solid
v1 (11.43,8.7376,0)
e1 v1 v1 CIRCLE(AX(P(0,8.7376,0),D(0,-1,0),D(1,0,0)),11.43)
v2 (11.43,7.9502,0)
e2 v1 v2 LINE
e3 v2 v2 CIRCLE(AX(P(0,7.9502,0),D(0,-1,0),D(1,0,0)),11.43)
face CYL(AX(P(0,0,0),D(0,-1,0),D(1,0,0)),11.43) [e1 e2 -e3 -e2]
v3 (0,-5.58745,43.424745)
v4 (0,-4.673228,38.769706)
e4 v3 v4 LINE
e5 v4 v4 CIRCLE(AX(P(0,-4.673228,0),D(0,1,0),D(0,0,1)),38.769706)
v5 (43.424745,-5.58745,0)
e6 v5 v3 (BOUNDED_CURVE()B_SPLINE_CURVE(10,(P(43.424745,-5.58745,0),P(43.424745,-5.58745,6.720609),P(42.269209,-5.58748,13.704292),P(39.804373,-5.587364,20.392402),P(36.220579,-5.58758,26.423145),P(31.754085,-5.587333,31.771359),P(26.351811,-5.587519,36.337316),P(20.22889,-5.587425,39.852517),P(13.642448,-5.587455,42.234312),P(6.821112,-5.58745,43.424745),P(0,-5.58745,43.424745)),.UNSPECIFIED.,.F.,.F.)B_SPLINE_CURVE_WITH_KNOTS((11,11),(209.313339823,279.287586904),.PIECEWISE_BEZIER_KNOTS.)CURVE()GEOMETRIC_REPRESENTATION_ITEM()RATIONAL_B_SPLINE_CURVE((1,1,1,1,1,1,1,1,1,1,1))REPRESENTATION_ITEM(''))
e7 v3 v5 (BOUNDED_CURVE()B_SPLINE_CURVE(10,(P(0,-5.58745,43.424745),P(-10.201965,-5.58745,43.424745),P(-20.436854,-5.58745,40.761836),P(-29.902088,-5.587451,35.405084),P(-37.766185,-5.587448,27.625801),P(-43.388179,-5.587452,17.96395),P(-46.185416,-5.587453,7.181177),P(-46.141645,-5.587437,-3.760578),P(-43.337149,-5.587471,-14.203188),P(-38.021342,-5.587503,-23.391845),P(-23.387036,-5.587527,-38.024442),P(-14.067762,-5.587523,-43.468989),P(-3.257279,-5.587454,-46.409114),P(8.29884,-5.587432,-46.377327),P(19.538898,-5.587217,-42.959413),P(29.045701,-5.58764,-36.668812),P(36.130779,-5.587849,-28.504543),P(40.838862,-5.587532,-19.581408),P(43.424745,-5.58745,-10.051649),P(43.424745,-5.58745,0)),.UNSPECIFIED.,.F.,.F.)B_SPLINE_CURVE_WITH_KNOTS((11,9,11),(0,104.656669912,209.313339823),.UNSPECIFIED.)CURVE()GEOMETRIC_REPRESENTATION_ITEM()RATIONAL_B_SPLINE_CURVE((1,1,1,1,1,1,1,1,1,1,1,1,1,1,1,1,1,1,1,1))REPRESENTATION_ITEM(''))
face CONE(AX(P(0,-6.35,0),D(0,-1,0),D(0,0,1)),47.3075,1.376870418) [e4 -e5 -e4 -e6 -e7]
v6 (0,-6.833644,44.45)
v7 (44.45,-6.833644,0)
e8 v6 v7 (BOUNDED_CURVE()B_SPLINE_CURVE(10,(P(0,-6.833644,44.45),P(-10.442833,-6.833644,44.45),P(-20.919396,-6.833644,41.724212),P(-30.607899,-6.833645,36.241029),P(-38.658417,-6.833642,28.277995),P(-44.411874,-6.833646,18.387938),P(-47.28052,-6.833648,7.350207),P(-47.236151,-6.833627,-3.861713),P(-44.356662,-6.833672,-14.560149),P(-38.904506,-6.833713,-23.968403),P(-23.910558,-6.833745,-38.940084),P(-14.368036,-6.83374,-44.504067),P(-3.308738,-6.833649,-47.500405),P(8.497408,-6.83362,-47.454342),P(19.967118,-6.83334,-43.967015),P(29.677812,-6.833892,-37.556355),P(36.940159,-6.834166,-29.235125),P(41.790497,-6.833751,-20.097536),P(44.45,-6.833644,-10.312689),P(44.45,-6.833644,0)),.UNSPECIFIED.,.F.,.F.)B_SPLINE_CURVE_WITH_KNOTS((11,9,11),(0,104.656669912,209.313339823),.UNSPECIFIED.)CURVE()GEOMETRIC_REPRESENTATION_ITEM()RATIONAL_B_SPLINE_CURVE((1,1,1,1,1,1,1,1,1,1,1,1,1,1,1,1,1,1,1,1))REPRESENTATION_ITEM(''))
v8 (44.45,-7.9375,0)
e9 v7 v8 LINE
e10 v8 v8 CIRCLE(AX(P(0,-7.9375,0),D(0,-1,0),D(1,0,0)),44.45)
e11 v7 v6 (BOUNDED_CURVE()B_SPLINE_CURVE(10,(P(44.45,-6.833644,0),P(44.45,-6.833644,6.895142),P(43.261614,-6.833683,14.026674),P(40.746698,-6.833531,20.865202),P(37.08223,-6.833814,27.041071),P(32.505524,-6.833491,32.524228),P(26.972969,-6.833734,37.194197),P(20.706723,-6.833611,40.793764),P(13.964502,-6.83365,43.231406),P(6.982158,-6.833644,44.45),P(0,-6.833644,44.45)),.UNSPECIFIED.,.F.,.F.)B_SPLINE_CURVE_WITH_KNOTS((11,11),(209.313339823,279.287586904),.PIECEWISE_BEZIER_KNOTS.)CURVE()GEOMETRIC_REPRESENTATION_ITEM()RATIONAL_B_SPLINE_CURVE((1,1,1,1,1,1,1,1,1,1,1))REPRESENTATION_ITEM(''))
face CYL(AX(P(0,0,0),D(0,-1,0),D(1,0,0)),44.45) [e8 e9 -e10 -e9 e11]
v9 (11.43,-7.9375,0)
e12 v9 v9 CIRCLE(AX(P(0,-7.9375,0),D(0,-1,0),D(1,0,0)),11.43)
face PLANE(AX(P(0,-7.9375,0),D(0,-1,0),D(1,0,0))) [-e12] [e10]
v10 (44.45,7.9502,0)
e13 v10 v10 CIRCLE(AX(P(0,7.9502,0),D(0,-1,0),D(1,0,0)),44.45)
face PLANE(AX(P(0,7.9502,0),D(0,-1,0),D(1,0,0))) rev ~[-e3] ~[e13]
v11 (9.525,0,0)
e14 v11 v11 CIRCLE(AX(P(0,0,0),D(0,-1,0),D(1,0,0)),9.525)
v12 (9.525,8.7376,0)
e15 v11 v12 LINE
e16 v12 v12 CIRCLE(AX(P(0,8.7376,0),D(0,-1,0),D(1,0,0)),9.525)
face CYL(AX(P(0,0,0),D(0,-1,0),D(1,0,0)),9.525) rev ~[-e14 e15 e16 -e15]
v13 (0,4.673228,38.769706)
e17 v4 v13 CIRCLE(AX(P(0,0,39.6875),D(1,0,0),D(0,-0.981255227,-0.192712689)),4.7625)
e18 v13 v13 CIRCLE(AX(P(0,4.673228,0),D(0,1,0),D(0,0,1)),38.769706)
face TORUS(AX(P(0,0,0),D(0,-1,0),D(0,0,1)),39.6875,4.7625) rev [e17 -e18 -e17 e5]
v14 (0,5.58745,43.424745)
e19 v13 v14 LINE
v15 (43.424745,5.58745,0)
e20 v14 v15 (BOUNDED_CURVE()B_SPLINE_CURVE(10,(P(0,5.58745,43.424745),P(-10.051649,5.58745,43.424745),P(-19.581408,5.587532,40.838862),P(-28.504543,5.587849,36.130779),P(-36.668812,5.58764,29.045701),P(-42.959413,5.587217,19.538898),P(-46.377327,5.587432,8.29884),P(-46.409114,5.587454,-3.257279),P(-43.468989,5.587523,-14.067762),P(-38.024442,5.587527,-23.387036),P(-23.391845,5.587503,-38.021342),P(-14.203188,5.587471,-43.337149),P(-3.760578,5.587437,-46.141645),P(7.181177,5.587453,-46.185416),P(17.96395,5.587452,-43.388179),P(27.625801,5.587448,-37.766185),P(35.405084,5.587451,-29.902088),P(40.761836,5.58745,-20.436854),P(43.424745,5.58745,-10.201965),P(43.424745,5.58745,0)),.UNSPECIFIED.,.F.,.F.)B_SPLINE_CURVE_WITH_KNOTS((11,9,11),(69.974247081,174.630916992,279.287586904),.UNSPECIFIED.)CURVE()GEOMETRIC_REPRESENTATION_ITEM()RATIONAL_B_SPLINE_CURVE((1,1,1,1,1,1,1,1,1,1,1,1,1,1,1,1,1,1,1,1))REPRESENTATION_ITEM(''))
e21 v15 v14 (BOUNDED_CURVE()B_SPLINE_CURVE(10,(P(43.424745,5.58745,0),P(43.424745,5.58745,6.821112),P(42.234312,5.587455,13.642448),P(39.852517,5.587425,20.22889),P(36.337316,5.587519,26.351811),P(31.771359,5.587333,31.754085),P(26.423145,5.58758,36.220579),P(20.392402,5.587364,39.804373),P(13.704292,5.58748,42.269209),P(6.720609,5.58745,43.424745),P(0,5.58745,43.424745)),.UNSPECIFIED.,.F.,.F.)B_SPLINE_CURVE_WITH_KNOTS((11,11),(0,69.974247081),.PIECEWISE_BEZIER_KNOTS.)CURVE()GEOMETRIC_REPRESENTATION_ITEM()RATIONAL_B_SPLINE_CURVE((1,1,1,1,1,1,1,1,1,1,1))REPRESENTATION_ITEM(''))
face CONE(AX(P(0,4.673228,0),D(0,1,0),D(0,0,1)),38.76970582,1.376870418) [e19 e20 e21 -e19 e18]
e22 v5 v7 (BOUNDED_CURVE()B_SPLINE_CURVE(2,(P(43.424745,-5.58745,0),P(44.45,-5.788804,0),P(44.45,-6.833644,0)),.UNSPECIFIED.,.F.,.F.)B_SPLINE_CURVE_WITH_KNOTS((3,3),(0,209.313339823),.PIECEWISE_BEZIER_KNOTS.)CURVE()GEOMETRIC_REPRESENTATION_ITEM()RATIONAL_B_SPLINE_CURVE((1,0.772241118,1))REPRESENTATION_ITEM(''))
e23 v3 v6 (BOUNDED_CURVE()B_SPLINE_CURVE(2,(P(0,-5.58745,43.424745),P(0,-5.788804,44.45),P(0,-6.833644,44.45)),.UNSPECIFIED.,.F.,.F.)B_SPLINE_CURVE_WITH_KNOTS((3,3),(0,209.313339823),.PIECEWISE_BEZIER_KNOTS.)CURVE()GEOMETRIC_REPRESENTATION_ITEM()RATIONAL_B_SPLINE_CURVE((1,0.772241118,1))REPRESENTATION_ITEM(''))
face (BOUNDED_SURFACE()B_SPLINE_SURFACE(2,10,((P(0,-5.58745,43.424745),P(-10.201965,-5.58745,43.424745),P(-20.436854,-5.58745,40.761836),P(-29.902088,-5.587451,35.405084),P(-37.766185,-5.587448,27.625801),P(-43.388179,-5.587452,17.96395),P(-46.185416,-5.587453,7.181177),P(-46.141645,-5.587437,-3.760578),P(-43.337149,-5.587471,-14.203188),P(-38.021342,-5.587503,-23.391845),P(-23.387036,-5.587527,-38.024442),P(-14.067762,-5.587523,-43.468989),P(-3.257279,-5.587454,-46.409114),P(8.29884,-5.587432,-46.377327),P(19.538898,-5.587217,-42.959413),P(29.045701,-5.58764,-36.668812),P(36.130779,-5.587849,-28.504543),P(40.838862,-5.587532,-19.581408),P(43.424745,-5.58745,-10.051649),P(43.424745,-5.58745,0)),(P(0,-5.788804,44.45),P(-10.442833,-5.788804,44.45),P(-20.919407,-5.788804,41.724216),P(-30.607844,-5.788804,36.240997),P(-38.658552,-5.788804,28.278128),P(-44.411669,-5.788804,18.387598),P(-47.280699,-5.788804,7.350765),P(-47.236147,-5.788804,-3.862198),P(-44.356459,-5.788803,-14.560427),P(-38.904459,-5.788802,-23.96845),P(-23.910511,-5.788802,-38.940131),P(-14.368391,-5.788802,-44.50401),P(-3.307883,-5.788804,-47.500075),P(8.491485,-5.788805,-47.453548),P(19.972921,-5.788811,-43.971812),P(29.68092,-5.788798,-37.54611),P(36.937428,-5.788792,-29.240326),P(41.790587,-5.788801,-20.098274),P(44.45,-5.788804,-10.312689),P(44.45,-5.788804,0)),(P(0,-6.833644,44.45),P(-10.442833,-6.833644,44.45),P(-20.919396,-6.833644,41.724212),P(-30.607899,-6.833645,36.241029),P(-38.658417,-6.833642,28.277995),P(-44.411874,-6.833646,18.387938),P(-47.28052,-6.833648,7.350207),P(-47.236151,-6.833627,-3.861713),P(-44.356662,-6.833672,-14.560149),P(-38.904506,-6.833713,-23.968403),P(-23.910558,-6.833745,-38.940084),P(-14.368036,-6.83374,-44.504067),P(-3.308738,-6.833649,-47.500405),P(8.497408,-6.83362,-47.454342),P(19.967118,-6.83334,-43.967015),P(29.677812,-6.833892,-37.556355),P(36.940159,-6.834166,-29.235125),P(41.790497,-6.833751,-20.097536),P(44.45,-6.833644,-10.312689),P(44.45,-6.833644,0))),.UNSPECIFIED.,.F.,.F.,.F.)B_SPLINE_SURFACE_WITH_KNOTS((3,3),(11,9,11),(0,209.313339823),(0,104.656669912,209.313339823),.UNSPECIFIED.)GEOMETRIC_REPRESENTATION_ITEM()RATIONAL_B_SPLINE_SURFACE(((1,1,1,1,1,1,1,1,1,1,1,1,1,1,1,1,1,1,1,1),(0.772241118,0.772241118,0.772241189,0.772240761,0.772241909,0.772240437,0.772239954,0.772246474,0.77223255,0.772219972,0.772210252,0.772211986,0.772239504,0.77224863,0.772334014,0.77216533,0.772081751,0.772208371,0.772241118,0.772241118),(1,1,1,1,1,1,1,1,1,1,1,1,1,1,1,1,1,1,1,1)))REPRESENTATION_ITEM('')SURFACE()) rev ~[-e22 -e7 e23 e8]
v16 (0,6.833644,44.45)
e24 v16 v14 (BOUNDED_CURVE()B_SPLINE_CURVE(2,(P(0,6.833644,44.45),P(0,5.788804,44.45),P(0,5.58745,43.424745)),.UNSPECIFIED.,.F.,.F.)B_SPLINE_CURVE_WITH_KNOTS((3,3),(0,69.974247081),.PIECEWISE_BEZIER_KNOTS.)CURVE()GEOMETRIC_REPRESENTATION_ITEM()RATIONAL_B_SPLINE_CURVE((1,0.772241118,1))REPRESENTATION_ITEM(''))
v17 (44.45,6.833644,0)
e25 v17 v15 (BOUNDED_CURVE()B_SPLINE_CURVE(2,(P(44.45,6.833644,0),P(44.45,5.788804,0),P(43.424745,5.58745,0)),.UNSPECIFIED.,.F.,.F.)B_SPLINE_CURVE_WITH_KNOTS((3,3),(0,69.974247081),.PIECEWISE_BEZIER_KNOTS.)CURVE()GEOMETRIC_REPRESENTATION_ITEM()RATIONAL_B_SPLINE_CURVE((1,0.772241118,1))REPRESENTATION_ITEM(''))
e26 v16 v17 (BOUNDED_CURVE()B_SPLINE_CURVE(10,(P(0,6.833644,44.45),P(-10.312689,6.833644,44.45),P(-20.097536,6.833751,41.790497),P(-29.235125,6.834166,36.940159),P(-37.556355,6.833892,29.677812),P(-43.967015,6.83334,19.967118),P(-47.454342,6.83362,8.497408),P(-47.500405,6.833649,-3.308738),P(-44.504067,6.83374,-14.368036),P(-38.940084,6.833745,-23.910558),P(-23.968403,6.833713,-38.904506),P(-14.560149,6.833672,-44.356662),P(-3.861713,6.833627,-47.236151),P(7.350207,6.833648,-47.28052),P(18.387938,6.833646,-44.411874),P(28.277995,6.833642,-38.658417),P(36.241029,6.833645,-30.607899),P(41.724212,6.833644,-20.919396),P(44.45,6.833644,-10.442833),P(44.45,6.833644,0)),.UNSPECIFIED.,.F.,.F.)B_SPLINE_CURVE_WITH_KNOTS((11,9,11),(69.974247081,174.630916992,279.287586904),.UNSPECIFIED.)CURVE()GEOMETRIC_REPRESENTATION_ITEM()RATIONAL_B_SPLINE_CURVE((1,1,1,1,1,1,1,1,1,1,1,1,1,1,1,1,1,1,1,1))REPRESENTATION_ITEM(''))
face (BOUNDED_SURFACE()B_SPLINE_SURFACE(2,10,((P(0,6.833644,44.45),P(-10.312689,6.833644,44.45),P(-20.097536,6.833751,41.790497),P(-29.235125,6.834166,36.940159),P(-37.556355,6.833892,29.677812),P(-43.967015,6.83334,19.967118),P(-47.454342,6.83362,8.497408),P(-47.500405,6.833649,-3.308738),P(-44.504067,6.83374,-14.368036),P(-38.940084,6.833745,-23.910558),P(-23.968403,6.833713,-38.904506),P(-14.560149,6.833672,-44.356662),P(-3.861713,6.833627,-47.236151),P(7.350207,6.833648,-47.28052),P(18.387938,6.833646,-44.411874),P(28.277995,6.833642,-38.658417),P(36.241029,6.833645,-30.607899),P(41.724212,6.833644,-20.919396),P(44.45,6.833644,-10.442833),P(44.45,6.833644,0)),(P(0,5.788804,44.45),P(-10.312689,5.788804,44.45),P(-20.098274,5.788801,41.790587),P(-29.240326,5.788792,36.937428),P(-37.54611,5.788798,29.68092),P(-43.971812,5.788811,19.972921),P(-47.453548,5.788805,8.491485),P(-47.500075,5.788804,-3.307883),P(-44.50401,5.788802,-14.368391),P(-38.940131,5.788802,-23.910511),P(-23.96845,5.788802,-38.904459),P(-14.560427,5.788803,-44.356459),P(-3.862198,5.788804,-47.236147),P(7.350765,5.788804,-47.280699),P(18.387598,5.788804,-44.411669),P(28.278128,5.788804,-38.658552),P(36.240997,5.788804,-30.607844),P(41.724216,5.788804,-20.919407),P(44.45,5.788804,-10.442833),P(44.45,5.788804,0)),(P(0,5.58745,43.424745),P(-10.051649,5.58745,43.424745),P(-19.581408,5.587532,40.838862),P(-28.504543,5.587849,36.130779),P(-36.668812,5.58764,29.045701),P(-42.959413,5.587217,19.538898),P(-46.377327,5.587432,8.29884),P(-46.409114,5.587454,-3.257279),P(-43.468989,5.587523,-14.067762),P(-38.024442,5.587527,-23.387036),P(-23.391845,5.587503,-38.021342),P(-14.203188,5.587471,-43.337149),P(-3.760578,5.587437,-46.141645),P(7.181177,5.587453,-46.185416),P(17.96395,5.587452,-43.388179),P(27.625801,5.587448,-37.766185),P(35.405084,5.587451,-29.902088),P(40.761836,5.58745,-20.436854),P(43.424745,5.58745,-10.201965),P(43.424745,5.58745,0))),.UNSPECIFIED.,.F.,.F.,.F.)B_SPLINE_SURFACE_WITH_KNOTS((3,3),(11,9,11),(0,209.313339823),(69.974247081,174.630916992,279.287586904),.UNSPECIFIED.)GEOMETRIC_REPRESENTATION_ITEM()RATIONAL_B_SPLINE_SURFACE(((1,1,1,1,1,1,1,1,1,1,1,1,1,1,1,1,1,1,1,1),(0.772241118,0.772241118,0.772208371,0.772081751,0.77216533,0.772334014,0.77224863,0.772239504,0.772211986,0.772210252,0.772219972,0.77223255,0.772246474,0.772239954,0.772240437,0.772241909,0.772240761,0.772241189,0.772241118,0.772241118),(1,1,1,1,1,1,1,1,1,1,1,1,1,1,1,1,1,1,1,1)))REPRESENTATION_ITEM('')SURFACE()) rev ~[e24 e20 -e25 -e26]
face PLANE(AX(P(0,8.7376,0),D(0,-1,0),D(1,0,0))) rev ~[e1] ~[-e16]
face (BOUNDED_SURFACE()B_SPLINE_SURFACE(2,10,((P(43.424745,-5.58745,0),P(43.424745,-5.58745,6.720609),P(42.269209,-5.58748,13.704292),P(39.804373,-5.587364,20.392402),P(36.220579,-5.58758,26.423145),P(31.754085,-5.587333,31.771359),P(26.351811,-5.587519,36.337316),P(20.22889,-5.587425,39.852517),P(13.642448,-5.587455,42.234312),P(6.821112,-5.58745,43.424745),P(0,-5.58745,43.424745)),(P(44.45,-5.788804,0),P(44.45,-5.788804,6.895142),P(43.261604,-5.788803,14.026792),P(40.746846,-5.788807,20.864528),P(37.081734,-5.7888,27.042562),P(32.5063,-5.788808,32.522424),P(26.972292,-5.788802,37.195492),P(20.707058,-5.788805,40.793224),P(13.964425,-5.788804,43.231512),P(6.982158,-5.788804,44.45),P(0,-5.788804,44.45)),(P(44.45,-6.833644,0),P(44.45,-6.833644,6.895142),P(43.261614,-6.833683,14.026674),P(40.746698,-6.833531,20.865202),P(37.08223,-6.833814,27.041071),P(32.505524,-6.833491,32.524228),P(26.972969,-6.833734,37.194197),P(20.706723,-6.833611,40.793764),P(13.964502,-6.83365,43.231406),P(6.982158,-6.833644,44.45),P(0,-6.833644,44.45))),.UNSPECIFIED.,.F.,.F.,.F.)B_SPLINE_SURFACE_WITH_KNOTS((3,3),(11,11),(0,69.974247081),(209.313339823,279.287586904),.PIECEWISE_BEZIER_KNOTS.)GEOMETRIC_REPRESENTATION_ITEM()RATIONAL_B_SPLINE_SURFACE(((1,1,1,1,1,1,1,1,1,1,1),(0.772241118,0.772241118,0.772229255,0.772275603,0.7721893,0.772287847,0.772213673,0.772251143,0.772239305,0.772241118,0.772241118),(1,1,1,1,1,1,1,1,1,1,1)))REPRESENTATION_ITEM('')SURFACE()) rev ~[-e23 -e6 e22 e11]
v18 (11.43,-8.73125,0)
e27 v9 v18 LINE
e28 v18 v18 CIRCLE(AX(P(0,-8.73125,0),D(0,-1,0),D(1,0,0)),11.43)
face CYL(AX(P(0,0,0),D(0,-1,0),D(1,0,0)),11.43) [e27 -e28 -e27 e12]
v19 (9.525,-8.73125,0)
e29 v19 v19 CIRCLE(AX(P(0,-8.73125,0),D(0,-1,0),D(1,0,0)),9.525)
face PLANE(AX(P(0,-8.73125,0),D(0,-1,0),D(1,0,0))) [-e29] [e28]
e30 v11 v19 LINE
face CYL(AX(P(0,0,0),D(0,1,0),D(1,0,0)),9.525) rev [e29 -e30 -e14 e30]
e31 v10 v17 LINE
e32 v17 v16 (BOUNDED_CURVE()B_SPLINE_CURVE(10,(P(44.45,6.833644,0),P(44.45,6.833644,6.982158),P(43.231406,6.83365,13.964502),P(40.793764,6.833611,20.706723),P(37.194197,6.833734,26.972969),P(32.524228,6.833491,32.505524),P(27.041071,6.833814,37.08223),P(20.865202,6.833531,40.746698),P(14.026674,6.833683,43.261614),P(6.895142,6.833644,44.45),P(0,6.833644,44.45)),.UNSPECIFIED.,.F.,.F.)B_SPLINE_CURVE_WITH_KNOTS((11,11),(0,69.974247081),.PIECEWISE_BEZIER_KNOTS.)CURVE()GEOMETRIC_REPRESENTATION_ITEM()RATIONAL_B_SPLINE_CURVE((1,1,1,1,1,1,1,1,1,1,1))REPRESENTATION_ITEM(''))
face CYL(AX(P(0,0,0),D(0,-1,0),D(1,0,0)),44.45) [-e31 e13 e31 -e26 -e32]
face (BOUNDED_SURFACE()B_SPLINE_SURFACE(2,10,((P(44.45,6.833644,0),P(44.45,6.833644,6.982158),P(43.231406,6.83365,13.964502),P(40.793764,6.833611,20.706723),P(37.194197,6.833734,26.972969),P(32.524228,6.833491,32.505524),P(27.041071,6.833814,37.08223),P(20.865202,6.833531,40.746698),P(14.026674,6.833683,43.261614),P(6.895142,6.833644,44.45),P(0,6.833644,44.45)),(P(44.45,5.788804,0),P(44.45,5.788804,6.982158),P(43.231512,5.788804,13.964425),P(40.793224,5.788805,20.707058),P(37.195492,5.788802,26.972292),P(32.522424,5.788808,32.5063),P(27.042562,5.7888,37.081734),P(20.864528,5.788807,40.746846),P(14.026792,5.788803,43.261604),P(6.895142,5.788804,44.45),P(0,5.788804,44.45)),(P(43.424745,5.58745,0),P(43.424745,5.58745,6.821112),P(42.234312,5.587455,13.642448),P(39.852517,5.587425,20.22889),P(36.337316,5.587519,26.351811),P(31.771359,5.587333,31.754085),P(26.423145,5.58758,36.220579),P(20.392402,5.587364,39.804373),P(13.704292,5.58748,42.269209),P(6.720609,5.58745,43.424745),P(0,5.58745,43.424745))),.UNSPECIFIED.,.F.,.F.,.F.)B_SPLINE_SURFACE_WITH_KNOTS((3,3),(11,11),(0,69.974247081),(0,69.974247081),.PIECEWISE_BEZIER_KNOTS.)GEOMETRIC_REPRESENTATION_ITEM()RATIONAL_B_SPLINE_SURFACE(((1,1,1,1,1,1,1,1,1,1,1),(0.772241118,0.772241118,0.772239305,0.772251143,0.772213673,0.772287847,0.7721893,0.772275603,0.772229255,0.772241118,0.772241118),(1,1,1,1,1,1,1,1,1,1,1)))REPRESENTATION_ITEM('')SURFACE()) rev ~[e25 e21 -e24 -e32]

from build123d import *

# Parameters (mm, degrees)
F0_R          = 11.43
F0_R_2        = 9.525
F1_DEPTH      = 8.73125
F1_DEPTH_BACK = 8.7376
F0_R_3        = 44.45
F2_DEPTH      = 7.9375
F2_DEPTH_BACK = 7.9502
F5_R          = 1.27


with BuildPart() as f1:
    # F0 (on Front) → F1 (new body, two sides)
    with BuildSketch(Plane.XZ) as f1_sk:
        Circle(F0_R)
        Circle(F0_R_2, mode=Mode.SUBTRACT)
    extrude(amount=F1_DEPTH)
    extrude(f1_sk.sketch, amount=-F1_DEPTH_BACK)

    # F0 (on Front) → F2 (join, two sides)
    with BuildSketch(Plane.XZ) as f2_sk:
        Circle(F0_R_3)
        Circle(F0_R, mode=Mode.SUBTRACT)
    extrude(amount=F2_DEPTH)
    extrude(f2_sk.sketch, amount=-F2_DEPTH_BACK)

    # F3 (on Right) → F4 (revolve, cut)
    with BuildSketch(Plane.YZ):
        with BuildLine():
            Line((-6.35, 47.3075), (-4.6732280163, 38.7697058197))
            ThreePointArc((-4.6732280163, 38.7697058197), (0, 34.925), (4.6732280163, 38.7697058197))
            Line((4.6732280163, 38.7697058197), (6.35, 47.3075))
            Line((6.35, 47.3075), (0, 47.3075))
            Line((0, 47.3075), (-6.35, 47.3075))
        make_face()
    revolve(axis=Axis((0, 33.8884852827, 0), (0, 1, 0)), mode=Mode.SUBTRACT)

    # F5
    f5_edges = [f1.edges().sort_by_distance(p)[0] for p in [
        (31.430896, 5.788804, 31.430896),
        (-31.430896, 5.788804, -31.430896),
        (-31.430896, -5.788804, -31.430896),
        (31.430896, -5.788804, 31.430896),
    ]]
    fillet(f5_edges, radius=F5_R)


solid = f1.part
